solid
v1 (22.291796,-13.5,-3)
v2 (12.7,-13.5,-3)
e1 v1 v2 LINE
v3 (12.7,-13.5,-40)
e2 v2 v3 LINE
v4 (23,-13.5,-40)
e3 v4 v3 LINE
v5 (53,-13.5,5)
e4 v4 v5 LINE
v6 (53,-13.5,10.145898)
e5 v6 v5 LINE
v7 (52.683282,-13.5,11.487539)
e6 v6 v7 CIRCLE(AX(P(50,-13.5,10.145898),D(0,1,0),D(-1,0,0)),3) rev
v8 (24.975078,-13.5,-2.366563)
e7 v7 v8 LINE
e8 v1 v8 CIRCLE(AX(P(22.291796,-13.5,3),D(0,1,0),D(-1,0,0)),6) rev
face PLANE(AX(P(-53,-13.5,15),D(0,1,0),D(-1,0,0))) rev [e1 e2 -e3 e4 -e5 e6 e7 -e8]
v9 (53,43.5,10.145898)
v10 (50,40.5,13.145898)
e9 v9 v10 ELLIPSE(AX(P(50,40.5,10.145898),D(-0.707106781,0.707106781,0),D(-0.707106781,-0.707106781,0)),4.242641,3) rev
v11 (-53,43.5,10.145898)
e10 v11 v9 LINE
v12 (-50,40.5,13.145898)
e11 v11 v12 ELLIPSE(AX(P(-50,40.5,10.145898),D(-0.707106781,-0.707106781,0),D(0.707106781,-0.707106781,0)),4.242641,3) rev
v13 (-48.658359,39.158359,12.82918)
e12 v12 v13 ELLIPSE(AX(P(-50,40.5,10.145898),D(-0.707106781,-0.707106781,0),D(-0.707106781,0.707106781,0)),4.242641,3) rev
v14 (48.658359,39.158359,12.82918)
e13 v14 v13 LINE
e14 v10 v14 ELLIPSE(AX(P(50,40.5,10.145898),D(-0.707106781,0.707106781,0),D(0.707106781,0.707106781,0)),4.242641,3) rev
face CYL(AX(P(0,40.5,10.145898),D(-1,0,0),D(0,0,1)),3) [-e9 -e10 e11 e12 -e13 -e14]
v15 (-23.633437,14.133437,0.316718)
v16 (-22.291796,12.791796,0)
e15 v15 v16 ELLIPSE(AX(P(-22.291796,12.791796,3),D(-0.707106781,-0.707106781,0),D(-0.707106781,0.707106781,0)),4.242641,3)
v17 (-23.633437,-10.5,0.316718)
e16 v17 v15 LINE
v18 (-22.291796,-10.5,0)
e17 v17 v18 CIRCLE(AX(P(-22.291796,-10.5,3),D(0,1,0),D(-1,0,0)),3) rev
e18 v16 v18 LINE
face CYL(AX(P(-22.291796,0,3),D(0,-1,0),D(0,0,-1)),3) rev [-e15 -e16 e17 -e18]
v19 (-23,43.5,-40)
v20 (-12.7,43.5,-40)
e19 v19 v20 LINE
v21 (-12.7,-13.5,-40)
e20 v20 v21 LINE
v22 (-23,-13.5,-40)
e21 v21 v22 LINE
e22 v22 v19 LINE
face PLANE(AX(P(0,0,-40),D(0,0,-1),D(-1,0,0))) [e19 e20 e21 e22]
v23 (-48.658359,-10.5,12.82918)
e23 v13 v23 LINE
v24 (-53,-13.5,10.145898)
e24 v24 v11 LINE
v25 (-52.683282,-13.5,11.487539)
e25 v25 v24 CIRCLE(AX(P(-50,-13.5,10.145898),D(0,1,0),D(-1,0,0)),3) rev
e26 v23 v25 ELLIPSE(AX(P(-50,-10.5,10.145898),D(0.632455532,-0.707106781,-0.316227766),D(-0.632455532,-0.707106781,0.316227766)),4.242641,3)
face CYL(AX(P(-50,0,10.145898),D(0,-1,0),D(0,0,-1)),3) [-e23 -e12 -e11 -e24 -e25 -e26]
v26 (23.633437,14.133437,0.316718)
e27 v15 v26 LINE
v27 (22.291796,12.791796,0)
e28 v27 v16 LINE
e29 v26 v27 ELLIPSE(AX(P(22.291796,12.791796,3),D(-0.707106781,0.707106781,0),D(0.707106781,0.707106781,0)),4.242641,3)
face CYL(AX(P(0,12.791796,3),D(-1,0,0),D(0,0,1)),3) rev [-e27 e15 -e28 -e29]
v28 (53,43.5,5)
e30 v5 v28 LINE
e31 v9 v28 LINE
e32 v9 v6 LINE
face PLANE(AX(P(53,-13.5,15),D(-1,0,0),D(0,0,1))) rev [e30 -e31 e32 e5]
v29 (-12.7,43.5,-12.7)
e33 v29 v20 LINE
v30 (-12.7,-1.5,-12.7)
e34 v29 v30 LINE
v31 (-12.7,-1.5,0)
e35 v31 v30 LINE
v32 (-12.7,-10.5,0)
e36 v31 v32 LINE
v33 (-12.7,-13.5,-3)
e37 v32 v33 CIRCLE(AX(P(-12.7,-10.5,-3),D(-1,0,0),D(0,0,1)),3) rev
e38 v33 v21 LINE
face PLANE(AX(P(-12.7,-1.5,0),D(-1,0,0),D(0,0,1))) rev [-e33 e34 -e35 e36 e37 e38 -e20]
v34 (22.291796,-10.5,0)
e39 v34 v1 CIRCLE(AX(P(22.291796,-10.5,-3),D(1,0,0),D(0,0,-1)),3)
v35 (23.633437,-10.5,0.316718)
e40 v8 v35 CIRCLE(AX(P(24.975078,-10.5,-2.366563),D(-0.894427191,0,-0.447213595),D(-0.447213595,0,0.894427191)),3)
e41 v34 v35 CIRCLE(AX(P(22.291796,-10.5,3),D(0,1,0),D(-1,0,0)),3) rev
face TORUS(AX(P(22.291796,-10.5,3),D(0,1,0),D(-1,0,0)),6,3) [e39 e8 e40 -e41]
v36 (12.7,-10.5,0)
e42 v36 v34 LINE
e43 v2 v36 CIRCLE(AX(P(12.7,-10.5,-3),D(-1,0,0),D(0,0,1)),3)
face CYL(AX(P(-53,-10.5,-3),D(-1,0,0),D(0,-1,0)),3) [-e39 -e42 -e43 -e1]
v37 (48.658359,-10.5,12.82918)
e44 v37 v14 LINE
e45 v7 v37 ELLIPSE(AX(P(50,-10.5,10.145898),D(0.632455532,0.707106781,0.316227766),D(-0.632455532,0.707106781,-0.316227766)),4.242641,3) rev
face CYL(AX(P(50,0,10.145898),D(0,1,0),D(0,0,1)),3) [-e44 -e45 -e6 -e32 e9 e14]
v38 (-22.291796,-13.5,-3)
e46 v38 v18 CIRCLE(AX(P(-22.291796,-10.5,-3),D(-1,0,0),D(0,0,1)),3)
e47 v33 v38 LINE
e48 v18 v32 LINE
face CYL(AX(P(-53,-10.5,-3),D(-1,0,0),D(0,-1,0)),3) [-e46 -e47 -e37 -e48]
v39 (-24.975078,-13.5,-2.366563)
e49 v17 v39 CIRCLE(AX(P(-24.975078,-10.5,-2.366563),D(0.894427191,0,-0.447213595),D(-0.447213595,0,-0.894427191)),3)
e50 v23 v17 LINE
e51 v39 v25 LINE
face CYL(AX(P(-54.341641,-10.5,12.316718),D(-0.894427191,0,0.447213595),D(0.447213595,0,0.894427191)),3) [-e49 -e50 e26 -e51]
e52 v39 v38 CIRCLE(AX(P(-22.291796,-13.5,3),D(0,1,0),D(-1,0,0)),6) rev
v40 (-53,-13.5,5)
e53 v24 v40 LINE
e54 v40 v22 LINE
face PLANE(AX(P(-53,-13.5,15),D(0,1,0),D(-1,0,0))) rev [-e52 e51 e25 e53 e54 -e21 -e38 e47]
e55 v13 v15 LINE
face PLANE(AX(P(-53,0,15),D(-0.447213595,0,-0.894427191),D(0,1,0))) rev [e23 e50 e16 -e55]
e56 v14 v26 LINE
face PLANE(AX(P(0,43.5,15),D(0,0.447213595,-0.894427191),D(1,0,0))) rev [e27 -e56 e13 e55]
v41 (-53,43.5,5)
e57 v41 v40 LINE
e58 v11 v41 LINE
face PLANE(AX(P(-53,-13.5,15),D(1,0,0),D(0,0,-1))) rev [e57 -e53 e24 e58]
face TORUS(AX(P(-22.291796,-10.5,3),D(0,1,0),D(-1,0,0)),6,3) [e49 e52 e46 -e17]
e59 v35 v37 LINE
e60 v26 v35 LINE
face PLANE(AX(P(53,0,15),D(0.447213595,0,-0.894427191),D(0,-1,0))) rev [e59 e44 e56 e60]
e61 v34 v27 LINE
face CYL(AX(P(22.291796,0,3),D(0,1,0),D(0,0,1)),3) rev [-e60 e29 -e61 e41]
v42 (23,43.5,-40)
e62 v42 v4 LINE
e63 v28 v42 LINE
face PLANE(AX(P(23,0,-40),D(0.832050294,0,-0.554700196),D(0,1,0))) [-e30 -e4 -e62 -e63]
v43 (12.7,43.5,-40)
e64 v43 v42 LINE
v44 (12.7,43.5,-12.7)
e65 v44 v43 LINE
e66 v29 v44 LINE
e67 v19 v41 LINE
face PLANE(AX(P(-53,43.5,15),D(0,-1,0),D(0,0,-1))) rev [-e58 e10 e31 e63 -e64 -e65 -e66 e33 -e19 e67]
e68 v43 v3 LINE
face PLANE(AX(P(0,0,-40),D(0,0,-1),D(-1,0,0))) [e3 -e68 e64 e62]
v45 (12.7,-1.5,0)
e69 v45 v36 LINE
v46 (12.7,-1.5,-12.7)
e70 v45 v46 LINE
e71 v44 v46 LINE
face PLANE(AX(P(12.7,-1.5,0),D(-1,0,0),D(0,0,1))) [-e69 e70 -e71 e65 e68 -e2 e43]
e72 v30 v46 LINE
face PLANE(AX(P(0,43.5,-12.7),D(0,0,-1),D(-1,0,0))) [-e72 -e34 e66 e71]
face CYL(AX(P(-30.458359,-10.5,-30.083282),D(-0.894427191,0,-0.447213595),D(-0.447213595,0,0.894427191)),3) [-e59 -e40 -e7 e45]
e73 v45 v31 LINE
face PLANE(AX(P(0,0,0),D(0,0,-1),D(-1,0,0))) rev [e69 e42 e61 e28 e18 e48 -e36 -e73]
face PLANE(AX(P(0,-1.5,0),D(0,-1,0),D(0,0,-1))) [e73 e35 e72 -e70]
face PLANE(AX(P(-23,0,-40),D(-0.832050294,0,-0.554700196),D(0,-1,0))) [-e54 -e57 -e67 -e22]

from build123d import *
from OCP.BRepFilletAPI import BRepFilletAPI_MakeChamfer

# Parameters (mm, degrees)
BOSS_EXTRUDE1_DEPTH = 15
SKETCH4_W           = 106
SKETCH4_H           = 57
BOSS_EXTRUDE3_DEPTH = 40
SKETCH5_W           = 25.4
SKETCH5_H           = 12.7
CUT_EXTRUDE3_DEPTH  = 12
SKETCH5_3_W         = 25.4
SKETCH5_3_H         = 27.3
CUT_EXTRUDE4_DEPTH  = 88.509999429
CHAMFER3_SIZE       = 45
CHAMFER3_SIZE2      = 30
FILLET2_R           = 3


with BuildPart() as part:
    # Sketch1 → Boss-Extrude1 (new body)
    with BuildSketch(Plane.XY):
        Polygon((23, -13.5), (53, -13.5), (53, 43.5), (-53, 43.5), (-53, -13.5), (-23, -13.5), (-23, 13.5), (23, 13.5), align=None)
    extrude(amount=BOSS_EXTRUDE1_DEPTH)

    # Chamfer1
    # the kernel refuses this chamfer: 30, 15 mm, written as the material it takes off along each edge
    with BuildSketch(Plane(origin=(23, 13.5, 15), x_dir=(-0.06891834360170887, 0, -0.9976223042390325), z_dir=(0, -1, 0)), Plane(origin=(-23, -13.5, 15), x_dir=(0.06891834360170887, 0, -0.9976223042390325), z_dir=(0, 1, 0))) as chamfer1_piece_1:
        with BuildLine():
            Line((15.573685801, 0), (-2.676901546, 30.962444281))
            Line((-2.676901546, 30.962444281), (-3.275474928, 30.921093275))
            ThreePointArc((-3.275474928, 30.921093275), (-1.669334001, 15.458363867), (-0.598573383, -0.041351006))
            Line((-0.598573383, -0.041351006), (0.041351006, -0.598573383))
            ThreePointArc((0.041351006, -0.598573383), (7.791208443, -0.063193073), (15.615036807, -0.598573383))
            Line((15.615036807, -0.598573383), (15.573685801, 0))
        make_face()
    extrude(amount=27, mode=Mode.SUBTRACT)
    with BuildSketch(Plane(origin=(-23, 13.5, 15), x_dir=(0, -0.06891834360170876, -0.9976223042390325), z_dir=(1, 0, 0))) as chamfer1_piece_2:
        with BuildLine():
            Line((15.573685801, 0), (-2.676901546, 30.962444281))
            Line((-2.676901546, 30.962444281), (-3.275474928, 30.921093275))
            ThreePointArc((-3.275474928, 30.921093275), (-1.669334001, 15.458363867), (-0.598573383, -0.041351006))
            Line((-0.598573383, -0.041351006), (0.041351006, -0.598573383))
            ThreePointArc((0.041351006, -0.598573383), (7.791208443, -0.063193073), (15.615036807, -0.598573383))
            Line((15.615036807, -0.598573383), (15.573685801, 0))
        make_face()
    extrude(amount=46, mode=Mode.SUBTRACT)
    with BuildSketch(Plane(origin=(-23, 13.5, 15), x_dir=(0, -0.06891834360170876, -0.9976223042390325), z_dir=(1, 0, 0))) as chamfer1_piece_3a_section:
        with BuildLine():
            Line((15.573685801, 0), (-2.676901546, 30.962444281))
            Line((-2.676901546, 30.962444281), (-3.275474928, 30.921093275))
            ThreePointArc((-3.275474928, 30.921093275), (-1.669334001, 15.458363867), (-0.598573383, -0.041351006))
            Line((-0.598573383, -0.041351006), (0.041351006, -0.598573383))
            ThreePointArc((0.041351006, -0.598573383), (7.791208443, -0.063193073), (15.615036807, -0.598573383))
            Line((15.615036807, -0.598573383), (15.573685801, 0))
        make_face()
    chamfer1_piece_3a = extrude(amount=123.694866214, mode=Mode.PRIVATE)
    chamfer1_piece_3a = split(chamfer1_piece_3a, bisect_by=Plane(origin=(23, 23.617605247, 10.241766787), z_dir=(1, 0, 0)), keep=Keep.TOP, mode=Mode.PRIVATE)
    with BuildSketch(Plane(origin=(23, 91.194866214, 15), x_dir=(-0.06891834360170887, 0, -0.9976223042390325), z_dir=(0, -1, 0))) as chamfer1_piece_3b_section:
        with BuildLine():
            Line((15.573685801, 0), (-2.676901546, 30.962444281))
            Line((-2.676901546, 30.962444281), (-3.275474928, 30.921093275))
            ThreePointArc((-3.275474928, 30.921093275), (-1.669334001, 15.458363867), (-0.598573383, -0.041351006))
            Line((-0.598573383, -0.041351006), (0.041351006, -0.598573383))
            ThreePointArc((0.041351006, -0.598573383), (7.791208443, -0.063193073), (15.615036807, -0.598573383))
            Line((15.615036807, -0.598573383), (15.573685801, 0))
        make_face()
    chamfer1_piece_3b = extrude(amount=104.694866214, mode=Mode.PRIVATE)
    chamfer1_piece_3b = split(chamfer1_piece_3b, bisect_by=Plane(origin=(33.117605247, 13.5, 10.241766787), z_dir=(0, 1, 0)), keep=Keep.TOP, mode=Mode.PRIVATE)
    chamfer1_piece_3 = chamfer1_piece_3a & chamfer1_piece_3b
    add(chamfer1_piece_3, mode=Mode.SUBTRACT)
    with BuildSketch(Plane(origin=(-23, -13.5, 15), x_dir=(0.06891834360170887, 0, -0.9976223042390325), z_dir=(0, 1, 0))) as chamfer1_piece_4a_section:
        with BuildLine():
            Line((15.573685801, 0), (-2.676901546, 30.962444281))
            Line((-2.676901546, 30.962444281), (-3.275474928, 30.921093275))
            ThreePointArc((-3.275474928, 30.921093275), (-1.669334001, 15.458363867), (-0.598573383, -0.041351006))
            Line((-0.598573383, -0.041351006), (0.041351006, -0.598573383))
            ThreePointArc((0.041351006, -0.598573383), (7.791208443, -0.063193073), (15.615036807, -0.598573383))
            Line((15.615036807, -0.598573383), (15.573685801, 0))
        make_face()
    chamfer1_piece_4a = extrude(amount=104.694866214, mode=Mode.PRIVATE)
    chamfer1_piece_4a = split(chamfer1_piece_4a, bisect_by=Plane(origin=(-33.117605247, 13.5, 10.241766787), z_dir=(0, 1, 0)), keep=Keep.TOP, mode=Mode.PRIVATE)
    with BuildSketch(Plane(origin=(-100.694866214, 13.5, 15), x_dir=(0, -0.06891834360170876, -0.9976223042390325), z_dir=(1, 0, 0))) as chamfer1_piece_4b_section:
        with BuildLine():
            Line((15.573685801, 0), (-2.676901546, 30.962444281))
            Line((-2.676901546, 30.962444281), (-3.275474928, 30.921093275))
            ThreePointArc((-3.275474928, 30.921093275), (-1.669334001, 15.458363867), (-0.598573383, -0.041351006))
            Line((-0.598573383, -0.041351006), (0.041351006, -0.598573383))
            ThreePointArc((0.041351006, -0.598573383), (7.791208443, -0.063193073), (15.615036807, -0.598573383))
            Line((15.615036807, -0.598573383), (15.573685801, 0))
        make_face()
    chamfer1_piece_4b = extrude(amount=123.694866214, mode=Mode.PRIVATE)
    chamfer1_piece_4b = split(chamfer1_piece_4b, bisect_by=Plane(origin=(-23, 23.617605247, 10.241766787), z_dir=(-1, 0, 0)), keep=Keep.TOP, mode=Mode.PRIVATE)
    chamfer1_piece_4 = chamfer1_piece_4a & chamfer1_piece_4b
    add(chamfer1_piece_4, mode=Mode.SUBTRACT)

    # Sketch4 → Boss-Extrude3 (add)
    with BuildSketch(Plane(origin=(0, 0, 0), x_dir=(-1, 0, 0), z_dir=(0, 0, -1))):
        with Locations((0, 15)):
            Rectangle(SKETCH4_W, SKETCH4_H)
    extrude(amount=BOSS_EXTRUDE3_DEPTH)

    # Sketch5 → Cut-Extrude3 (cut)
    with BuildSketch(Plane.XZ.offset(13.5)):
        with Locations((0, -6.35)):
            Rectangle(SKETCH5_W, SKETCH5_H)
    extrude(amount=-CUT_EXTRUDE3_DEPTH, mode=Mode.SUBTRACT)

    # Sketch5<3> → Cut-Extrude4 (cut, through all)
    with BuildSketch(Plane.XZ.offset(13.5)):
        with Locations((0, -26.35)):
            Rectangle(SKETCH5_3_W, SKETCH5_3_H)
    extrude(amount=-CUT_EXTRUDE4_DEPTH, mode=Mode.SUBTRACT)

    # Chamfer3: one chamfer whose edges measure the first distance from different faces: ONE call of the kernel's chamfer builder (chamfer() names one face for all edges)
    chamfer3_edges_1 = [part.edges().sort_by_distance(p)[0] for p in [
        (53, 15, -40),
    ]]
    chamfer3_side_1 = [part.faces().sort_by_distance(p)[0] for p in [
        (53, 15, -12.5),
    ]]
    chamfer3_edges_2 = [part.edges().sort_by_distance(p)[0] for p in [
        (-53, 15, -40),
    ]]
    chamfer3_side_2 = [part.faces().sort_by_distance(p)[0] for p in [
        (-53, 15, -12.5),
    ]]
    chamfer3 = BRepFilletAPI_MakeChamfer(part.part.solid().wrapped)
    for e in chamfer3_edges_1:
        chamfer3.Add(CHAMFER3_SIZE, CHAMFER3_SIZE2, e.wrapped, chamfer3_side_1[0].wrapped)  # the first distance lies on this face
    for e in chamfer3_edges_2:
        chamfer3.Add(CHAMFER3_SIZE, CHAMFER3_SIZE2, e.wrapped, chamfer3_side_2[0].wrapped)  # the first distance lies on this face
    add(Compound.cast(chamfer3.Shape()), mode=Mode.REPLACE)

    # Fillet2
    fillet2_edges = [part.edges().sort_by_distance(p)[0] for p in [
        (23, 0, 0),
        (0, 13.5, 0),
        (-23, 0, 0),
    ]]
    fillet(fillet2_edges, radius=FILLET2_R)
    fillet2_2_edges = [part.edges().sort_by_distance(p)[0] for p in [
        (53, 15, 15),
        (0, 43.5, 15),
        (-53, 15, 15),
        (38.316718427, -13.5, 7.658359213),
        (-38.316718427, -13.5, 7.658359213),
        (17.495898034, -13.5, 0),
        (-17.495898034, -13.5, 0),
        (-22.981054829, -13.5, 0.080253032),
        (22.981054829, -13.5, 0.080253032),
    ]]
    fillet(fillet2_2_edges, radius=FILLET2_R)


solid = part.part
